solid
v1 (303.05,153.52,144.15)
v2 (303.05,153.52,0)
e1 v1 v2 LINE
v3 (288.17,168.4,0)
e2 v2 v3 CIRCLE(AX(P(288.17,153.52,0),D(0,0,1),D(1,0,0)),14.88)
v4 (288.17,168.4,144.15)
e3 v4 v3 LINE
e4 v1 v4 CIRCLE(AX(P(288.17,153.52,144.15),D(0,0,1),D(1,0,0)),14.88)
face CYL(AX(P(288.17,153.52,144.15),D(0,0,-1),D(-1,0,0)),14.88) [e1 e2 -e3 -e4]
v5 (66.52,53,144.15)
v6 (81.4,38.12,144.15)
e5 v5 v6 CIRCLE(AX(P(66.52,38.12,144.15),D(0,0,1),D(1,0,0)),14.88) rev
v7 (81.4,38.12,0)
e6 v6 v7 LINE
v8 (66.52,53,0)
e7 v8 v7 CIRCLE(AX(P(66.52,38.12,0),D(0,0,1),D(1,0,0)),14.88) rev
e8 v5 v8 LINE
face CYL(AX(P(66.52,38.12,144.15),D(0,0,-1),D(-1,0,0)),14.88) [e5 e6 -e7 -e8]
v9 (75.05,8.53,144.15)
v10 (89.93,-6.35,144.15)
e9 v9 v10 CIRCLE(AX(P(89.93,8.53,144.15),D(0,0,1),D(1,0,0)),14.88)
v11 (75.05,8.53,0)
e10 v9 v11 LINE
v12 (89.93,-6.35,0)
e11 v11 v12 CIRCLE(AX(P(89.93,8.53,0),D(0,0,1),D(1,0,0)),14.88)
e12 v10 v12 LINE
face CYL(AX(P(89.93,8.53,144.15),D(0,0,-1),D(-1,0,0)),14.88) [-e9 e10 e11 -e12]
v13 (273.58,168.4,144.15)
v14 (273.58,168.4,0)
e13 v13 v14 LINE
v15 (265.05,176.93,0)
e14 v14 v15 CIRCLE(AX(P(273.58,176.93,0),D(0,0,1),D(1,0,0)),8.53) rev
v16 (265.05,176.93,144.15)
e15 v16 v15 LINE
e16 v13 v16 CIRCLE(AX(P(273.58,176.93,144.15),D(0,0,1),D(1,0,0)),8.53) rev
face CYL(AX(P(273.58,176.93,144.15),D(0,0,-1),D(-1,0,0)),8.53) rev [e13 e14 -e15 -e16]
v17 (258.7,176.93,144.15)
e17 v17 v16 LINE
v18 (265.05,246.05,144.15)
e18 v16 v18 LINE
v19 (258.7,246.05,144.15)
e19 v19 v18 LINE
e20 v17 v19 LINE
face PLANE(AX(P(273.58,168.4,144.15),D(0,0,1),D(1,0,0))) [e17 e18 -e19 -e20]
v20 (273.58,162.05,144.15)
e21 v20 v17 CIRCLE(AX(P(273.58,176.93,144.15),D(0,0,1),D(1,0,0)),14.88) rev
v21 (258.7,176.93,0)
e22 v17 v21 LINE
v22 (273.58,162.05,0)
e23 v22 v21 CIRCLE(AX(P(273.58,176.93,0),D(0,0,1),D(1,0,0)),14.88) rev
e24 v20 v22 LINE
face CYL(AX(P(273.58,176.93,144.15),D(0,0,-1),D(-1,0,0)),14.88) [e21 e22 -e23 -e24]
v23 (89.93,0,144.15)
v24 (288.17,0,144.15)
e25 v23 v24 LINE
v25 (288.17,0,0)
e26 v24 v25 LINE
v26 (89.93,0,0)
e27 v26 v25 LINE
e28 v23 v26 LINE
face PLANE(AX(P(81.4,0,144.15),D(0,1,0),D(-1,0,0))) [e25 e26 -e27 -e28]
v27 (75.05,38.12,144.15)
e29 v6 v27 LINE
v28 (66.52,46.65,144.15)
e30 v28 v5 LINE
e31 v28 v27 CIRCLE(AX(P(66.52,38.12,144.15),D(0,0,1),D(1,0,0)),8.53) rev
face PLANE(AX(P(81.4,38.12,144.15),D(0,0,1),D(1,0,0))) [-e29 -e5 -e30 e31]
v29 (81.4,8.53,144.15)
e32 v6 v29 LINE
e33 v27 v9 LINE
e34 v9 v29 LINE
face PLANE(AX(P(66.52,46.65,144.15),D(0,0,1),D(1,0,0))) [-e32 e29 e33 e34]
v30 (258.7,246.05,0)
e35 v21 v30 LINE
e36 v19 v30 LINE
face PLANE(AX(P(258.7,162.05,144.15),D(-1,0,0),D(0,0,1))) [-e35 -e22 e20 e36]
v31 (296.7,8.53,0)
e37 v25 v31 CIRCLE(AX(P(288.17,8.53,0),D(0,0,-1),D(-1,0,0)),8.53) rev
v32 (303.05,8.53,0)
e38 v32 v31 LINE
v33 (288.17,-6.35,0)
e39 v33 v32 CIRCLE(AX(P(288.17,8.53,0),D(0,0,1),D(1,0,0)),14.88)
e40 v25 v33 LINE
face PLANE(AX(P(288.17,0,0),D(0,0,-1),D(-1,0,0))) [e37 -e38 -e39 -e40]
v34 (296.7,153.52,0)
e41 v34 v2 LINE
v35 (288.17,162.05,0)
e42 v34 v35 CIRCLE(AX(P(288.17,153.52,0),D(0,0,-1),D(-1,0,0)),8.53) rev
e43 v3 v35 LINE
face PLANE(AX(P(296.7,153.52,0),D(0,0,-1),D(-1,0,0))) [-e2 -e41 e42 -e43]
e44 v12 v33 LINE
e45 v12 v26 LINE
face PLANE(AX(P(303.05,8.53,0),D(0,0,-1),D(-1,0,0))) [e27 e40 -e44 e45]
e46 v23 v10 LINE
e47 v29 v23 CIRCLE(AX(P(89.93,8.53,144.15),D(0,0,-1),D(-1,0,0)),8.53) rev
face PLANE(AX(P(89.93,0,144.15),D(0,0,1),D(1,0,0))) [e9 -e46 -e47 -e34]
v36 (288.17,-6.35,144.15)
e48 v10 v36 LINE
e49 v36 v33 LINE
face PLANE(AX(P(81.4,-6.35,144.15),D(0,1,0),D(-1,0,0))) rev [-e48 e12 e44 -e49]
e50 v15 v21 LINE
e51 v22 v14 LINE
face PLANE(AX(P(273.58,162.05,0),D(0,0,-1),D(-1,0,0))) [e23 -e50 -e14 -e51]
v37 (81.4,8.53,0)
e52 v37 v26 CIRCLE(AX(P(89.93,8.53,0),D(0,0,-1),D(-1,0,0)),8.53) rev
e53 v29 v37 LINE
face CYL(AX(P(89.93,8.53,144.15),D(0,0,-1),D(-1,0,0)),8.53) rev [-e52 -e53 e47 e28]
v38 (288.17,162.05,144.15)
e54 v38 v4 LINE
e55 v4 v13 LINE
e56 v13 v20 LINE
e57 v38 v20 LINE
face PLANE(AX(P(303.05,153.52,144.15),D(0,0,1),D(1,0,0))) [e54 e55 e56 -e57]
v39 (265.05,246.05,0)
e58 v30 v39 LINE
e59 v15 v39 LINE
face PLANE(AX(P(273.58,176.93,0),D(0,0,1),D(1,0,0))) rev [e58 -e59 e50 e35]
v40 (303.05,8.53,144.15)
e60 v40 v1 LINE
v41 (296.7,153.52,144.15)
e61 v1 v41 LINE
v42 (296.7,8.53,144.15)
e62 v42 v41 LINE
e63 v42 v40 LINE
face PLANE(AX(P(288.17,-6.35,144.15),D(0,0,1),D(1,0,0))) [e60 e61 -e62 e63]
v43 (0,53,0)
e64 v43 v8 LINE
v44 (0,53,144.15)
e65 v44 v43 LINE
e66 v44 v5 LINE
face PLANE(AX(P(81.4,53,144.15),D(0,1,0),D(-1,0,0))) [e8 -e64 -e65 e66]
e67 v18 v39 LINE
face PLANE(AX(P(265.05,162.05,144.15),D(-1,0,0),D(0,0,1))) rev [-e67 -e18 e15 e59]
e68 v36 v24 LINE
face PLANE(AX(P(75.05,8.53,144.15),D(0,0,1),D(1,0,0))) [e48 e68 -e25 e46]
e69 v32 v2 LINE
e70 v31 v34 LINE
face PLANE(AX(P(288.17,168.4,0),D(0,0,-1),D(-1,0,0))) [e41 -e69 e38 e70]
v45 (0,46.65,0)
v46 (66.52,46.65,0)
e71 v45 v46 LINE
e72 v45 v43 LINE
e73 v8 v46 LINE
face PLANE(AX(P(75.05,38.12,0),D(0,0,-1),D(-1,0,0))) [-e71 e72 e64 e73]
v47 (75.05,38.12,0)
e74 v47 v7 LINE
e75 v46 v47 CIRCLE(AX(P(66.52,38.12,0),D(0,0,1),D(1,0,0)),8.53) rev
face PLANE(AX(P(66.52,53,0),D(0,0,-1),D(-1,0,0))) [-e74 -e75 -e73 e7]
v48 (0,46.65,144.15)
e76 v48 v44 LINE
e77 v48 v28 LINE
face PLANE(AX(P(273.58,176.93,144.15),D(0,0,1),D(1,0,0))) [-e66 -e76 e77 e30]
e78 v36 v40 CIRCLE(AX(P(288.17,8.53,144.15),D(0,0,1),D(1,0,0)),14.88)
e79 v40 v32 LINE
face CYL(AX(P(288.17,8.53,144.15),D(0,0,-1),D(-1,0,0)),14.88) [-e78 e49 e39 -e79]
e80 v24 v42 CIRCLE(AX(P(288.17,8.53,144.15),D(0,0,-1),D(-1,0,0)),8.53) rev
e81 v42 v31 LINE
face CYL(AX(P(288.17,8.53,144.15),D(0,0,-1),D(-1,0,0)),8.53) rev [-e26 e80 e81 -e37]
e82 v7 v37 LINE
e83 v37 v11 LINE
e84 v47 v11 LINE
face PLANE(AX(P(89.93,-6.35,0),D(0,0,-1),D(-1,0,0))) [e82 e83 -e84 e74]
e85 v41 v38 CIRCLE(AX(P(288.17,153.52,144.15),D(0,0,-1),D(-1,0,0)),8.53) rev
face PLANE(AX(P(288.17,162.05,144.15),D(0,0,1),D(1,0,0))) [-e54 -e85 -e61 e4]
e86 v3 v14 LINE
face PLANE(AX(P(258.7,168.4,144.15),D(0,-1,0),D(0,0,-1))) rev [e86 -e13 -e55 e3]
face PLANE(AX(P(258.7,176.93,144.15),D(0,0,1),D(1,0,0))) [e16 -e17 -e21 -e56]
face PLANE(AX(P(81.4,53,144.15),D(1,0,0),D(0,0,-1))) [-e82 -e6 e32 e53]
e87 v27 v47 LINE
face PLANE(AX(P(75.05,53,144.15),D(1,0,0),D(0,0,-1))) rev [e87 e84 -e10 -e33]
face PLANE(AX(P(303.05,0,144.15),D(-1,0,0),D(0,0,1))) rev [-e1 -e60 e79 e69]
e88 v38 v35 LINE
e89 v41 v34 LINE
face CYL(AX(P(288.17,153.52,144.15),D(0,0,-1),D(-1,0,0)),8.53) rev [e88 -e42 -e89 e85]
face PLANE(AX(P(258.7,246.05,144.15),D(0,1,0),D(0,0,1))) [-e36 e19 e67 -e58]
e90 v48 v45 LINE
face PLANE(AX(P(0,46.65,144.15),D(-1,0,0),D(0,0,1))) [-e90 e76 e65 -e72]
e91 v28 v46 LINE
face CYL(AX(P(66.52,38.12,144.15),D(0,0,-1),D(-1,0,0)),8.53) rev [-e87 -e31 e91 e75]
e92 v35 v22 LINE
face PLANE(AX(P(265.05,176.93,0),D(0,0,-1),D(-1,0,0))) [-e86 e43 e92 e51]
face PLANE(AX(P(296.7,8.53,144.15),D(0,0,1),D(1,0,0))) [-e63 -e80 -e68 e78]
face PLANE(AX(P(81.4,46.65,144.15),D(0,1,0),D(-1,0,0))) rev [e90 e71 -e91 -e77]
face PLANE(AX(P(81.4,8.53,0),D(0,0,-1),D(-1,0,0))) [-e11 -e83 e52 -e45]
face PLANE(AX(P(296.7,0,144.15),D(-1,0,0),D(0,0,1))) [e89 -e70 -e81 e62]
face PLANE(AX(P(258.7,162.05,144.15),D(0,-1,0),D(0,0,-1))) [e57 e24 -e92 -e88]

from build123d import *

# Parameters (mm, degrees)
BRIDA_BASE1_DEPTH = 144.15


# Sheet-metal steps are written as plain solids
with BuildPart() as part:
    # Croquis1 → Brida base1 (new body)
    with BuildSketch(Plane.XY):
        with BuildLine():
            Line((258.7, 246.05), (258.7, 176.93))
            ThreePointArc((258.7, 176.93), (263.058251096, 166.408251096), (273.58, 162.05))
            Line((273.58, 162.05), (288.17, 162.05))
            ThreePointArc((288.17, 162.05), (294.201620844, 159.551620844), (296.7, 153.52))
            Line((296.7, 153.52), (296.7, 8.53))
            ThreePointArc((296.7, 8.53), (294.201620844, 2.498379156), (288.17, 0))
            Line((288.17, 0), (89.93, 0))
            ThreePointArc((89.93, 0), (83.898379156, 2.498379156), (81.4, 8.53))
            Line((81.4, 8.53), (81.4, 38.12))
            ThreePointArc((81.4, 38.12), (77.041748904, 48.641748904), (66.52, 53))
            Line((66.52, 53), (0, 53))
            Line((0, 53), (0, 46.65))
            Line((0, 46.65), (66.52, 46.65))
            ThreePointArc((66.52, 46.65), (72.551620844, 44.151620844), (75.05, 38.12))
            Line((75.05, 38.12), (75.05, 8.53))
            ThreePointArc((75.05, 8.53), (79.408251096, -1.991748904), (89.93, -6.35))
            Line((89.93, -6.35), (288.17, -6.35))
            ThreePointArc((288.17, -6.35), (298.691748904, -1.991748904), (303.05, 8.53))
            Line((303.05, 8.53), (303.05, 153.52))
            ThreePointArc((303.05, 153.52), (298.691748904, 164.041748904), (288.17, 168.4))
            Line((288.17, 168.4), (273.58, 168.4))
            ThreePointArc((273.58, 168.4), (267.548379156, 170.898379156), (265.05, 176.93))
            Line((265.05, 176.93), (265.05, 246.05))
            Line((265.05, 246.05), (258.7, 246.05))
        make_face()
    extrude(amount=BRIDA_BASE1_DEPTH)


solid = part.part
